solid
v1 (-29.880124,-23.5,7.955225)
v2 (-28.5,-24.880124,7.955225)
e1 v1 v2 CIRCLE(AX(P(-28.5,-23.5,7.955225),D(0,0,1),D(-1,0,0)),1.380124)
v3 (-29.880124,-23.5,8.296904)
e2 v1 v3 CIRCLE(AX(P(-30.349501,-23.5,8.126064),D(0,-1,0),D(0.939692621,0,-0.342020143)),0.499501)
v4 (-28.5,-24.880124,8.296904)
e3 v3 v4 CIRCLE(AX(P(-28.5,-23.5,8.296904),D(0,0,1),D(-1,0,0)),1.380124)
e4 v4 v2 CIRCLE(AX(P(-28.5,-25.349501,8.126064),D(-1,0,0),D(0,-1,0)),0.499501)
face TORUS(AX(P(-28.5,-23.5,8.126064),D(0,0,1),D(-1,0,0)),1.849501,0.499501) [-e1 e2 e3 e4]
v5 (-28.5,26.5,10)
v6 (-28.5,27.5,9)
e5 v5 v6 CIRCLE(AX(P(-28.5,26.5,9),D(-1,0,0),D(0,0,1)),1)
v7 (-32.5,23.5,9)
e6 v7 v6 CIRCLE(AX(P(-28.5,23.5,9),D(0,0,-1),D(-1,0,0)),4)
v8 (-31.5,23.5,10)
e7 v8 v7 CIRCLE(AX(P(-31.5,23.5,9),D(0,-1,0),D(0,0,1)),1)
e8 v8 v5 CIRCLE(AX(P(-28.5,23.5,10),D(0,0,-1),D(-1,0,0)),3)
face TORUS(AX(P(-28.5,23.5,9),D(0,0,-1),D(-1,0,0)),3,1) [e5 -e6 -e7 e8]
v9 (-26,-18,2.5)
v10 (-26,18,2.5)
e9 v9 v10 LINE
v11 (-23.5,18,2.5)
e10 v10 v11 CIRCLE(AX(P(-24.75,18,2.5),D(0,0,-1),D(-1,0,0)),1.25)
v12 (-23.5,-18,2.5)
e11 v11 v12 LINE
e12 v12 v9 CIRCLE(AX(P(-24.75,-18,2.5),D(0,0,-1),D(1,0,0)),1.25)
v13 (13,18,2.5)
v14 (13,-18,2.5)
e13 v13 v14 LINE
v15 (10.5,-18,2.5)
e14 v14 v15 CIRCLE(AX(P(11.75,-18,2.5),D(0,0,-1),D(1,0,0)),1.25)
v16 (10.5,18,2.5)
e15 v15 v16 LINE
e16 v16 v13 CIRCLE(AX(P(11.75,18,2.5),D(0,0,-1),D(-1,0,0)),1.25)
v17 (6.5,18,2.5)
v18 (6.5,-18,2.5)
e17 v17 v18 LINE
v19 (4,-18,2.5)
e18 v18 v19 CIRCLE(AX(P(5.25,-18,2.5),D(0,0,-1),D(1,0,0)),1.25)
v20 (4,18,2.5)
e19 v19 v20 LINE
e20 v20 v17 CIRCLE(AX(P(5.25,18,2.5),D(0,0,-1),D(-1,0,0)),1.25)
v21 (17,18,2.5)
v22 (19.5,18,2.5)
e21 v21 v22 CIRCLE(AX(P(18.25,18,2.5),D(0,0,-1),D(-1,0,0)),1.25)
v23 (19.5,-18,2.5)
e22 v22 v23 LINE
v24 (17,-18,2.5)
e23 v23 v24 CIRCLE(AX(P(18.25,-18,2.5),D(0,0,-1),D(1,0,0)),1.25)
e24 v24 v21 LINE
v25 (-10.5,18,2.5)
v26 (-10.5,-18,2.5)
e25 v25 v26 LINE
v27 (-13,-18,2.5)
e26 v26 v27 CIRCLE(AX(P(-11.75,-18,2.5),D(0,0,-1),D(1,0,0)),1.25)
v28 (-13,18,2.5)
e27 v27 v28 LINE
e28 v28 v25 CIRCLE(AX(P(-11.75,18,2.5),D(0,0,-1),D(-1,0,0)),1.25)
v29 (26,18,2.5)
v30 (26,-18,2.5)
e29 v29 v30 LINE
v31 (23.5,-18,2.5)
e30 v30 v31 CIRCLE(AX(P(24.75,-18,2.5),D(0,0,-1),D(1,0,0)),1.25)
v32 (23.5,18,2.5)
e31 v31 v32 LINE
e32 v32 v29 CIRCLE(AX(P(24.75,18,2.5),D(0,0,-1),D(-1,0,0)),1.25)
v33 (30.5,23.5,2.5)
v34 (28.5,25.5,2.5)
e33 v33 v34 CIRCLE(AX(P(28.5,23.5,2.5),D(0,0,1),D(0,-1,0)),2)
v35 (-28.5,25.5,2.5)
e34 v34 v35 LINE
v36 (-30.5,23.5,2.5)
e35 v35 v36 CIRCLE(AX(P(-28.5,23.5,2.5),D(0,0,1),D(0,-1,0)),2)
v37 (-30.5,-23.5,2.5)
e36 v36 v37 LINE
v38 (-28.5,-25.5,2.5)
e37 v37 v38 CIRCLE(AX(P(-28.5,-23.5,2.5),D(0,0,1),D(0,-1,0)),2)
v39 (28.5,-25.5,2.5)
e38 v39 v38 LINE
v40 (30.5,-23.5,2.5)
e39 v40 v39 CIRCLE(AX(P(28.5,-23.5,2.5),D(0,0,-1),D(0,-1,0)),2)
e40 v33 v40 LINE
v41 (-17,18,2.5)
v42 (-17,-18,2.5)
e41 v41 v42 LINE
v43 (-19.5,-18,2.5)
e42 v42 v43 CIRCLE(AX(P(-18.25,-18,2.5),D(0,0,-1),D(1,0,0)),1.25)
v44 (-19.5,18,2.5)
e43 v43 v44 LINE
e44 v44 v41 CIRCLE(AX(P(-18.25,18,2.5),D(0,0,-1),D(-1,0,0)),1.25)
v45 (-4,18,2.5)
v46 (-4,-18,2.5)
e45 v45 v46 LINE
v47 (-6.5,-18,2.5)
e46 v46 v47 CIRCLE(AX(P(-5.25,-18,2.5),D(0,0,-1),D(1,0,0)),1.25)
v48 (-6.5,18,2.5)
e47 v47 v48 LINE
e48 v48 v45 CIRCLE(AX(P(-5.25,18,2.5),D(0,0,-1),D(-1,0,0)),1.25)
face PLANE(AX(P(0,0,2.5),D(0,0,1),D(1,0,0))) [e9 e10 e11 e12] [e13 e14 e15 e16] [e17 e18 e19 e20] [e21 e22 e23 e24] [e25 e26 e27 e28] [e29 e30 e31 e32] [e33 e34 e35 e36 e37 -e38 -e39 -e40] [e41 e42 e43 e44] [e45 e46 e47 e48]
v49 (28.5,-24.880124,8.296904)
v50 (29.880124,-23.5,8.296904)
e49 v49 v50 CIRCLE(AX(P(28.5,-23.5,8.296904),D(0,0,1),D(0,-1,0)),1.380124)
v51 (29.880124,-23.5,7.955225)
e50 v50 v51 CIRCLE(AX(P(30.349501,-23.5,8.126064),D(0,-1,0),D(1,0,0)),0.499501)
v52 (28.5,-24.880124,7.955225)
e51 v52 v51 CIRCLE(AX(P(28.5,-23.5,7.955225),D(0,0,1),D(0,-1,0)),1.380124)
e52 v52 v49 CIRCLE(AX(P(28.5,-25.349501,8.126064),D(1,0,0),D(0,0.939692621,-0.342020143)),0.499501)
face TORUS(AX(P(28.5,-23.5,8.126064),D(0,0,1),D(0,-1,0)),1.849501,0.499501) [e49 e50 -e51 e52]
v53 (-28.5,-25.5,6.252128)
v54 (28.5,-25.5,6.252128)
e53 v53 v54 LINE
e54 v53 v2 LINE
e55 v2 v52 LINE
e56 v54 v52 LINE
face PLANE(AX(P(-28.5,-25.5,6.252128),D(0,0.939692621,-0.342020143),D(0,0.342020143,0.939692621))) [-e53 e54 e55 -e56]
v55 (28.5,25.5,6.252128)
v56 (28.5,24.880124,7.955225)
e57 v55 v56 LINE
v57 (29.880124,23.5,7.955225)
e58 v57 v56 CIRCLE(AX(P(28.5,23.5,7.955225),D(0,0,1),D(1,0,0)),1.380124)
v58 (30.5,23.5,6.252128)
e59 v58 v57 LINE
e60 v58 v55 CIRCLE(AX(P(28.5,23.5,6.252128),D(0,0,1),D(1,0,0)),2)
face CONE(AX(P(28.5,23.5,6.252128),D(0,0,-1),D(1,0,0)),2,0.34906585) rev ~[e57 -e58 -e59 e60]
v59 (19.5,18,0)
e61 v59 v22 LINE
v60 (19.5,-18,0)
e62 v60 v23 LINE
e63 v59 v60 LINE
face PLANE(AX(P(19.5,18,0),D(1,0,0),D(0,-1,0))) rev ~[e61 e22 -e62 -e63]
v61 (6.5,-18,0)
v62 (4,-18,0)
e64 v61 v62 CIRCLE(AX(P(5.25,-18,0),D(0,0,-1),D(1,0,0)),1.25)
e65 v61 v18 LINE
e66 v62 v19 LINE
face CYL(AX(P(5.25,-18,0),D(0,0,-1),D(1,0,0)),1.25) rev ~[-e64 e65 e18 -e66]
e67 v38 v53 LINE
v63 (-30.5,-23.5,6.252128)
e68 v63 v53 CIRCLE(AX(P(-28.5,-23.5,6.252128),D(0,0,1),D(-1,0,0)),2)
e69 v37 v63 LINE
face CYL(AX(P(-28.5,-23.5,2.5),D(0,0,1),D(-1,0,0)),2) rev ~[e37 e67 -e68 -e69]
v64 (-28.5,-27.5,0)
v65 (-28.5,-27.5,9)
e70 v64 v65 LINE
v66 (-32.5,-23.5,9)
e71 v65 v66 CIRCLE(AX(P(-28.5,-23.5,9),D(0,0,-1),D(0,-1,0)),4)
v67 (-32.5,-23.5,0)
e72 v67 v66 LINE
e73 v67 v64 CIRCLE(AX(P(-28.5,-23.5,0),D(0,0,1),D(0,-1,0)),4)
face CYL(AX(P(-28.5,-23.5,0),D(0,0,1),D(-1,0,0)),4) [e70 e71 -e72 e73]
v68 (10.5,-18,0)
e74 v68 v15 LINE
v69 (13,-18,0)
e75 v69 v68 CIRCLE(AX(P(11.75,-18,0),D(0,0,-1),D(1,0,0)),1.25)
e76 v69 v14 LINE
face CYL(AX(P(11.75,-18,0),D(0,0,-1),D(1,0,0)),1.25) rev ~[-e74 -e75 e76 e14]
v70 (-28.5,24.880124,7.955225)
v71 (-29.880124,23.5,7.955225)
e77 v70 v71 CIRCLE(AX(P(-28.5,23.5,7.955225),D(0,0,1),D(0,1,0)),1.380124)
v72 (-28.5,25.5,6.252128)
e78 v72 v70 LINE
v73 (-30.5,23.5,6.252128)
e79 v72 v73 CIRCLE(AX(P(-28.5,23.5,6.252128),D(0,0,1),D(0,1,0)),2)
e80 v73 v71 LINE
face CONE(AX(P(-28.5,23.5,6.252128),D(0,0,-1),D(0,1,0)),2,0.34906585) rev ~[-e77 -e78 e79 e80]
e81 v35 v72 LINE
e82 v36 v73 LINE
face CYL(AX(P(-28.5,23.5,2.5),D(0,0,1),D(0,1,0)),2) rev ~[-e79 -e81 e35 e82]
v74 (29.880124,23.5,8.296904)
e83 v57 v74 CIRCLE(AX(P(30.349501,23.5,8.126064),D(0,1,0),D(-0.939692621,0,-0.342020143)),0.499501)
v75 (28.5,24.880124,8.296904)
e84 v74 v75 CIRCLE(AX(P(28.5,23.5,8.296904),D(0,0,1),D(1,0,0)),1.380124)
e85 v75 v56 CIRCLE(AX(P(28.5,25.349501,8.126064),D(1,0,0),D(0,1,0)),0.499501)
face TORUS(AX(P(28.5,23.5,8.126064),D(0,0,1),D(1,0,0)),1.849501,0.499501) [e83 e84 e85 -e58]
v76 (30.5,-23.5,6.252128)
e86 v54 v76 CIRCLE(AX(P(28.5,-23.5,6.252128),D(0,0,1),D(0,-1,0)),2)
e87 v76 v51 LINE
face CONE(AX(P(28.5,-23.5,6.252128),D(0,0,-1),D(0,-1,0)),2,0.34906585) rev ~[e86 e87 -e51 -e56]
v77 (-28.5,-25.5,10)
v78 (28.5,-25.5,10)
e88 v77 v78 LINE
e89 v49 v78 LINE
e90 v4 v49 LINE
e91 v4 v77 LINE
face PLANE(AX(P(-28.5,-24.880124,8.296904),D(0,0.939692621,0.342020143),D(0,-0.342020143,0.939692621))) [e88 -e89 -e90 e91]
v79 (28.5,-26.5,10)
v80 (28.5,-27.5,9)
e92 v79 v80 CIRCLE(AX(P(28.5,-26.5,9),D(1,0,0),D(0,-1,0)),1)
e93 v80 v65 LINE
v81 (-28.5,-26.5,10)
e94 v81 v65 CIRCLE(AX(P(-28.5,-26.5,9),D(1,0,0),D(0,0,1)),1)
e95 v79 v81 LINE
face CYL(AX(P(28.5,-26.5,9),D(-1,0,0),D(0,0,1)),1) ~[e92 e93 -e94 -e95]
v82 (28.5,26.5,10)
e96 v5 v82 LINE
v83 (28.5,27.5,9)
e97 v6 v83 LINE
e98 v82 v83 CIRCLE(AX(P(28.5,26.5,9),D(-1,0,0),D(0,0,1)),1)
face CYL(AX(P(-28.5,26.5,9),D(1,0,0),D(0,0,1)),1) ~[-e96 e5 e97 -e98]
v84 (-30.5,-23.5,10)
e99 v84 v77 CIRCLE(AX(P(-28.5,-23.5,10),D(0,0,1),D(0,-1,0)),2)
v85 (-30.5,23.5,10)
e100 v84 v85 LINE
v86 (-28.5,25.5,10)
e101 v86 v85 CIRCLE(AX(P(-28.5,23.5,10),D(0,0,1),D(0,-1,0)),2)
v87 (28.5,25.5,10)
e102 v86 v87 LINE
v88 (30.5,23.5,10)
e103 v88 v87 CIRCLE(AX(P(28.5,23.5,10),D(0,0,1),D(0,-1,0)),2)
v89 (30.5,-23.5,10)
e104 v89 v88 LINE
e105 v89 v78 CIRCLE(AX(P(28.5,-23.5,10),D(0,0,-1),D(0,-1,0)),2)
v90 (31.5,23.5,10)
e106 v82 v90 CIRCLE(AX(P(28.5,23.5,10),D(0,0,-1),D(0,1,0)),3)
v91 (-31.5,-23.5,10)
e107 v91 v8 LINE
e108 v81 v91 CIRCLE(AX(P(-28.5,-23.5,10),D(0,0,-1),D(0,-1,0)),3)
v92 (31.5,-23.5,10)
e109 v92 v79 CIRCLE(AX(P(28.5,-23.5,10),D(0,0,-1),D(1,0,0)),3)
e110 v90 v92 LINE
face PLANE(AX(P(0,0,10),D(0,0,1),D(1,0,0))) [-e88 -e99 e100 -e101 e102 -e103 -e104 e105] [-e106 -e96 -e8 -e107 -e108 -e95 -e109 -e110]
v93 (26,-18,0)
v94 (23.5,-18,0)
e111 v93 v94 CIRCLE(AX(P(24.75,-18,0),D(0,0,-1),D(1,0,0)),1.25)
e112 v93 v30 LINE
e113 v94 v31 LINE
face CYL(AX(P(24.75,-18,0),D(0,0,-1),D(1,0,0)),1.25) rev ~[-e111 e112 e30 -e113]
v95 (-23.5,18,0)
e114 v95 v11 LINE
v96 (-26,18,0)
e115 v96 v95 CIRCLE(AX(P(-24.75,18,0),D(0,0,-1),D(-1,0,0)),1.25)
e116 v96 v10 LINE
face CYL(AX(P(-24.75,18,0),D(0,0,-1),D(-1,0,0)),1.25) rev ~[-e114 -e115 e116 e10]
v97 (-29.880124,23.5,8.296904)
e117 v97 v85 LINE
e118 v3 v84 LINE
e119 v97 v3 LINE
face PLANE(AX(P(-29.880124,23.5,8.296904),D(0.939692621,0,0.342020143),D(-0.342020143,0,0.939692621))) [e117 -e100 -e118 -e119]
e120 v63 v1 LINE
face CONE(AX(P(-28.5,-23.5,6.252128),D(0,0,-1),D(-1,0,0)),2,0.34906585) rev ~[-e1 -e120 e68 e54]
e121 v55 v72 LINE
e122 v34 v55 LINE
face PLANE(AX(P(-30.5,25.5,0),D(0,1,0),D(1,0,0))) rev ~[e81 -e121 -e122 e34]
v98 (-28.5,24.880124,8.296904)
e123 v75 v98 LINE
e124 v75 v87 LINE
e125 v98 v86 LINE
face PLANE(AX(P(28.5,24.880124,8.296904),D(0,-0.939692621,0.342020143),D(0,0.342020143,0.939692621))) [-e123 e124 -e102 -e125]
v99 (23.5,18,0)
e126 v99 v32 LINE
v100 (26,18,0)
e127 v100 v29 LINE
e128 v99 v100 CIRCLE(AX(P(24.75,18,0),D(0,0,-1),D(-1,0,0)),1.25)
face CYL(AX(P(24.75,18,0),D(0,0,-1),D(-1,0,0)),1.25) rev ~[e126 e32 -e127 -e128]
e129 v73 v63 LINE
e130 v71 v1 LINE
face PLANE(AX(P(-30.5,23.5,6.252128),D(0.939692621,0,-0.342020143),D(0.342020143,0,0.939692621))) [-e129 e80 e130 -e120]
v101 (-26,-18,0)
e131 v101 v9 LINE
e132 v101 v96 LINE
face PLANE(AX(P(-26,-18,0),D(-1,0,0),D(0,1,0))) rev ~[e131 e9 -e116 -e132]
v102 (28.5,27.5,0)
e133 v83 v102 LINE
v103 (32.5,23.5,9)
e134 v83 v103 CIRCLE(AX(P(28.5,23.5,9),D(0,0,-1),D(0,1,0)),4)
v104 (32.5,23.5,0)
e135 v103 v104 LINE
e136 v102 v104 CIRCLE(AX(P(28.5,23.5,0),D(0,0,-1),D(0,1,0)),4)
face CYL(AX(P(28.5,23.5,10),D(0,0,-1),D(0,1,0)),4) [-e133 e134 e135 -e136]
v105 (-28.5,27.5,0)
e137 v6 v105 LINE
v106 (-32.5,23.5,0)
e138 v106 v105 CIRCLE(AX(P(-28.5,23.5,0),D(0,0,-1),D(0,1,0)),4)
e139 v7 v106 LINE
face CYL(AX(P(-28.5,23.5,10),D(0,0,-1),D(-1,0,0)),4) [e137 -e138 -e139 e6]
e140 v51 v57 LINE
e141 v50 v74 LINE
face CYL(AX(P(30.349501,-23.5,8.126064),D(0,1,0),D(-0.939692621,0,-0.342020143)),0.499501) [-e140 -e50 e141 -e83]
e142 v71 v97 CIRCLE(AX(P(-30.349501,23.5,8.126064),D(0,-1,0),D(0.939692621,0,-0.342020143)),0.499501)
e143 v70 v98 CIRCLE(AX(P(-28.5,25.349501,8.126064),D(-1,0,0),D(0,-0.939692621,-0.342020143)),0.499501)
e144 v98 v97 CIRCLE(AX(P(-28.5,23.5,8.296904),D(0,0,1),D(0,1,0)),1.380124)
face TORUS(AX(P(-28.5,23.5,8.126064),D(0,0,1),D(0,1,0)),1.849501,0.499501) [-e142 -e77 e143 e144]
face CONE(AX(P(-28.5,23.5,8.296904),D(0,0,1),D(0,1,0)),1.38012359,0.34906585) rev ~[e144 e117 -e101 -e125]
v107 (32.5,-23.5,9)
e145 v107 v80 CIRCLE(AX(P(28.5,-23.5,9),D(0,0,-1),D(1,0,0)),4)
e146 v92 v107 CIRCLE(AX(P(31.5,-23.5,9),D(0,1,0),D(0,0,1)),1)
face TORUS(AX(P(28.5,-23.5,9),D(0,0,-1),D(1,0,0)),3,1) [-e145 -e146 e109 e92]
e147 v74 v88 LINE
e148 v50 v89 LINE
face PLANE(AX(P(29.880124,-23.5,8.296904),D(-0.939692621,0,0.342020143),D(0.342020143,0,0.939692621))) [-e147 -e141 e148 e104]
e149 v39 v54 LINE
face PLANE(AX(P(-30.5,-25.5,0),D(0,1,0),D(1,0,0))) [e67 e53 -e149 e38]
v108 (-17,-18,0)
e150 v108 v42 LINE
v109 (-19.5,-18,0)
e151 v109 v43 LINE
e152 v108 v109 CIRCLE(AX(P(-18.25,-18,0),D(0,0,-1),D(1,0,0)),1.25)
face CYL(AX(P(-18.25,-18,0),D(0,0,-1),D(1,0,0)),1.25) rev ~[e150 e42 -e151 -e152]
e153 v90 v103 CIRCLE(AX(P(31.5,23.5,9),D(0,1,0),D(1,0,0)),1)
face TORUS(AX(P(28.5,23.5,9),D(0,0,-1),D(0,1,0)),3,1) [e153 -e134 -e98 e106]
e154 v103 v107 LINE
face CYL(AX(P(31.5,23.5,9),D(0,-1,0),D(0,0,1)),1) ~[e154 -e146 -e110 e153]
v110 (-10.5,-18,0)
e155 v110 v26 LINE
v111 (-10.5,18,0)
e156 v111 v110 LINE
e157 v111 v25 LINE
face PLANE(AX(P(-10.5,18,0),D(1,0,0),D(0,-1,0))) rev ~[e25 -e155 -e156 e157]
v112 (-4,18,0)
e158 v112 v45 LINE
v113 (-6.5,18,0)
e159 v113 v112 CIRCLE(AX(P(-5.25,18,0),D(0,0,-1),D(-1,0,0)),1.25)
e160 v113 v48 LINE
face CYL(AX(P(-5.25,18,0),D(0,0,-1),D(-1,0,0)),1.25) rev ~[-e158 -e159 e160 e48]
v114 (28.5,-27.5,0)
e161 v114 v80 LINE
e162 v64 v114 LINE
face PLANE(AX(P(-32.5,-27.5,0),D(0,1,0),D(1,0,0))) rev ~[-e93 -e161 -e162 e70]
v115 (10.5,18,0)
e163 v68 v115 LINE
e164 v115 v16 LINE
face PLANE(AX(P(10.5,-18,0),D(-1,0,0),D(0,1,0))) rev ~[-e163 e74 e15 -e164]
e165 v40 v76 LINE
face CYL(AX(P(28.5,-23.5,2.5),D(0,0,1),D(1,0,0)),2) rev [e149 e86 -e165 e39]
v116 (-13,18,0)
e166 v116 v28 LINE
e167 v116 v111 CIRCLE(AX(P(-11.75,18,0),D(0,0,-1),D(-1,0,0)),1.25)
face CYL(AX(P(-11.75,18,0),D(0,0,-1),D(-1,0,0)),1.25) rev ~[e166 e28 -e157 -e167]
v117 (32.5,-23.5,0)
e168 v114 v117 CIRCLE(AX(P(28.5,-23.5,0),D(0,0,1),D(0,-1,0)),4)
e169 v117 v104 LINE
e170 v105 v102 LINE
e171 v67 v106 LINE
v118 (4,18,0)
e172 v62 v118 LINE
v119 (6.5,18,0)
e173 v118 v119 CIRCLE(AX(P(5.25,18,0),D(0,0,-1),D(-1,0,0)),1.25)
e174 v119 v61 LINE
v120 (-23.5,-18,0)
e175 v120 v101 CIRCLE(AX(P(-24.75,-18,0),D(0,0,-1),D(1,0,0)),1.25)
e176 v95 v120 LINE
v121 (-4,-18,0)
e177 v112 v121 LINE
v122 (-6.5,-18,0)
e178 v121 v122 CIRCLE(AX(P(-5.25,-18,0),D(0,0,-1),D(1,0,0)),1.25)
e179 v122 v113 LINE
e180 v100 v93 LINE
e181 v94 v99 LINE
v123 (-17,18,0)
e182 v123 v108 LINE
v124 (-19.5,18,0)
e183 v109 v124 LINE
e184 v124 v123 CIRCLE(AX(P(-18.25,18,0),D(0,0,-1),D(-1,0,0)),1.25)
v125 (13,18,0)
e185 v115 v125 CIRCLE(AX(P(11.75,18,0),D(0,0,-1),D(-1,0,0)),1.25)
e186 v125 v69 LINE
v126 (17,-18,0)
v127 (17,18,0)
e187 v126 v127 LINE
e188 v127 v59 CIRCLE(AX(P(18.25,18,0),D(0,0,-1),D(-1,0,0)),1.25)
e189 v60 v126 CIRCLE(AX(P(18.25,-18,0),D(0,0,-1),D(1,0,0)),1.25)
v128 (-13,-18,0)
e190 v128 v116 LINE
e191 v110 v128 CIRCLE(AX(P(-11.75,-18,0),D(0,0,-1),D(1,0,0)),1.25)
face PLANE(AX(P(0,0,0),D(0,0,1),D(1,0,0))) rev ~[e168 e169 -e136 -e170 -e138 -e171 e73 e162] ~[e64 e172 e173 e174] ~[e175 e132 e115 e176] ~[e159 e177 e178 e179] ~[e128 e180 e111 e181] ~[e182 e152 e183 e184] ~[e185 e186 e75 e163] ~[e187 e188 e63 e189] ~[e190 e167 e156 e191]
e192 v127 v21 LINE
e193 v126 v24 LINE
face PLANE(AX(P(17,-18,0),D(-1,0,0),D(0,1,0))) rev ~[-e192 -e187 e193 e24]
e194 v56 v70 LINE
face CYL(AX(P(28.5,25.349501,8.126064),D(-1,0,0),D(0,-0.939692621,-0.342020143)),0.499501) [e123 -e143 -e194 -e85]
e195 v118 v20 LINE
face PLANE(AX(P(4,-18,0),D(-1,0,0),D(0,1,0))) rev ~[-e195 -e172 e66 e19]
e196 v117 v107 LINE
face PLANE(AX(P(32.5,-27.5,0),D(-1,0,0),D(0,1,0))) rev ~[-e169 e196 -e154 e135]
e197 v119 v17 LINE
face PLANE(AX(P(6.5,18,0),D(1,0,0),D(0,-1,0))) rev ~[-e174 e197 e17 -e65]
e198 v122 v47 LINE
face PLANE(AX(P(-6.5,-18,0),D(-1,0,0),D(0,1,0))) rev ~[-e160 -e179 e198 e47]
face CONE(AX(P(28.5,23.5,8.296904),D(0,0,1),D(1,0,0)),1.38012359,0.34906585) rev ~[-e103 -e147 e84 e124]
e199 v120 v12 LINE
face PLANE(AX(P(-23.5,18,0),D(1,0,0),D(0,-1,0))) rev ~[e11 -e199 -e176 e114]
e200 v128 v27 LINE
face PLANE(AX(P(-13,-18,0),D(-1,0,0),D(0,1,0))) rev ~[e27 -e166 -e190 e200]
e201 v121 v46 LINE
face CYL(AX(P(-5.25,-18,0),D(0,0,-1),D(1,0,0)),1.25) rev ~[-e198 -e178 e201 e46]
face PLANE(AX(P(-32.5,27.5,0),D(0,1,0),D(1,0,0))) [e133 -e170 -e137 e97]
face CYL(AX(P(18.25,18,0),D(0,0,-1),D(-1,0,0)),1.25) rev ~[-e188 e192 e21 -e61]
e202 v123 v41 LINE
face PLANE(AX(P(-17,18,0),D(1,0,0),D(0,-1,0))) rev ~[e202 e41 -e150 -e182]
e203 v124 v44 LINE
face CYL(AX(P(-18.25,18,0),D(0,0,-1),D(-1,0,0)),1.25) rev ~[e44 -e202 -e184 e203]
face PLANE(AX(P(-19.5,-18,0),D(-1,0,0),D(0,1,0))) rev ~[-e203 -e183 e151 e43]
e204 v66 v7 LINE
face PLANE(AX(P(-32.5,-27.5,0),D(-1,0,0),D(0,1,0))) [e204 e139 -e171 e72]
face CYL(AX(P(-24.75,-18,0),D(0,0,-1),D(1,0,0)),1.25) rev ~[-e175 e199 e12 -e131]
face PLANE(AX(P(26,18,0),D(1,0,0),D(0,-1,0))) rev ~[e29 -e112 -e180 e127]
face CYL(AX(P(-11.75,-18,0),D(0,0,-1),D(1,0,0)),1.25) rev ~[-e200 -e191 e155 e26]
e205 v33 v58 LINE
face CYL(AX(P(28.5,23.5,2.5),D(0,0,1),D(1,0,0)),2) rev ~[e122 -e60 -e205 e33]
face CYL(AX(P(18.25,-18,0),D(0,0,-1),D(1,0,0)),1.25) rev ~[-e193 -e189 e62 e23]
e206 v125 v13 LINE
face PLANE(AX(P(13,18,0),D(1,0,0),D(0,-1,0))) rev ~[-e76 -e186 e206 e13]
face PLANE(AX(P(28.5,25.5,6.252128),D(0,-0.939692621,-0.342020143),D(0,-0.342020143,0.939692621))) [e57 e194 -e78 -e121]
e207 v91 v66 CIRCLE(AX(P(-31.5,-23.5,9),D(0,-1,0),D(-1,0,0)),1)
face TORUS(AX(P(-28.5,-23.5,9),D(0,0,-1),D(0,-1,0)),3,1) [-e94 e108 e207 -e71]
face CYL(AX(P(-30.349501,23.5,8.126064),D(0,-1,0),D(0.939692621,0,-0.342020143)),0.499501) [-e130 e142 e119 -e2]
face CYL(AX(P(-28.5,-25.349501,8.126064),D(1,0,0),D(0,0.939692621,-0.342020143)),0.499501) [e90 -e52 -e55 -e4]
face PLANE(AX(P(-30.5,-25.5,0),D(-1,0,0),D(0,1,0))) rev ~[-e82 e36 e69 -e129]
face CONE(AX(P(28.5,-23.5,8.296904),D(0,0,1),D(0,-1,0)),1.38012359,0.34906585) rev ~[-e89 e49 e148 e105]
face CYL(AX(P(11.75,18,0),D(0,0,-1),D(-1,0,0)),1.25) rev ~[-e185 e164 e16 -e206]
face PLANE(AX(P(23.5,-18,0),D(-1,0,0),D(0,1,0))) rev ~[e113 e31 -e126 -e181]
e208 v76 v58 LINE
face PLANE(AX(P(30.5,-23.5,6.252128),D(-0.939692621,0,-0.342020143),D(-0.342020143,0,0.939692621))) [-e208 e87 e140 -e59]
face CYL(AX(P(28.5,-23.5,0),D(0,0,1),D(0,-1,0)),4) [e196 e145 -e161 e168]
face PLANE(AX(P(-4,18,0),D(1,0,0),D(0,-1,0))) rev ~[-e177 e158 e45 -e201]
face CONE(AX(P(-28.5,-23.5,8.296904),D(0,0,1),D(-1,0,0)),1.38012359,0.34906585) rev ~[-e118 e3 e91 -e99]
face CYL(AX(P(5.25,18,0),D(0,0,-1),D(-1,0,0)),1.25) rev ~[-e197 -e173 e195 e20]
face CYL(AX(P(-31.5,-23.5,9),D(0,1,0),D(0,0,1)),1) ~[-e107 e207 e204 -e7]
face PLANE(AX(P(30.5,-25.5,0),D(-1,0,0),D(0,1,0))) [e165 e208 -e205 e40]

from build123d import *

# Parameters (mm, degrees)
F0_W     = 65
F0_H     = 55
F0_W_2   = 61
F0_H_2   = 51
F1_DEPTH = 2.5
F2_DEPTH = 10
F3_R     = 2
F4_R     = 4
F7_R     = 1


with BuildPart() as f1:
    # F0 (on Top) → F1 (new body)
    with BuildSketch(Plane.XY):
        Rectangle(F0_W, F0_H)
        Rectangle(F0_W_2, F0_H_2, mode=Mode.SUBTRACT)
        Rectangle(F0_W_2, F0_H_2)
        with BuildLine():
            ThreePointArc((-26, 18), (-24.75, 19.25), (-23.5, 18))
            Line((-23.5, 18), (-23.5, -18))
            ThreePointArc((-23.5, -18), (-24.75, -19.25), (-26, -18))
            Line((-26, -18), (-26, 18))
        make_face(mode=Mode.SUBTRACT)
        with BuildLine():
            Line((-19.5, -18), (-19.5, 18))
            ThreePointArc((-19.5, 18), (-18.25, 19.25), (-17, 18))
            Line((-17, 18), (-17, -18))
            ThreePointArc((-17, -18), (-18.25, -19.25), (-19.5, -18))
        make_face(mode=Mode.SUBTRACT)
        with BuildLine():
            Line((-13, -18), (-13, 18))
            ThreePointArc((-13, 18), (-11.75, 19.25), (-10.5, 18))
            Line((-10.5, 18), (-10.5, -18))
            ThreePointArc((-10.5, -18), (-11.75, -19.25), (-13, -18))
        make_face(mode=Mode.SUBTRACT)
        with BuildLine():
            Line((-6.5, -18), (-6.5, 18))
            ThreePointArc((-6.5, 18), (-5.25, 19.25), (-4, 18))
            Line((-4, 18), (-4, -18))
            ThreePointArc((-4, -18), (-5.25, -19.25), (-6.5, -18))
        make_face(mode=Mode.SUBTRACT)
        with BuildLine():
            Line((4, -18), (4, 18))
            ThreePointArc((4, 18), (5.25, 19.25), (6.5, 18))
            Line((6.5, 18), (6.5, -18))
            ThreePointArc((6.5, -18), (5.25, -19.25), (4, -18))
        make_face(mode=Mode.SUBTRACT)
        with BuildLine():
            Line((10.5, -18), (10.5, 18))
            ThreePointArc((10.5, 18), (11.75, 19.25), (13, 18))
            Line((13, 18), (13, -18))
            ThreePointArc((13, -18), (11.75, -19.25), (10.5, -18))
        make_face(mode=Mode.SUBTRACT)
        with BuildLine():
            ThreePointArc((17, 18), (18.25, 19.25), (19.5, 18))
            Line((19.5, 18), (19.5, -18))
            ThreePointArc((19.5, -18), (18.25, -19.25), (17, -18))
            Line((17, -18), (17, 18))
        make_face(mode=Mode.SUBTRACT)
        with BuildLine():
            Line((23.5, -18), (23.5, 18))
            ThreePointArc((23.5, 18), (24.75, 19.25), (26, 18))
            Line((26, 18), (26, -18))
            ThreePointArc((26, -18), (24.75, -19.25), (23.5, -18))
        make_face(mode=Mode.SUBTRACT)
    extrude(amount=F1_DEPTH)

    # F0 (on Top) → F2 (join)
    with BuildSketch(Plane.XY):
        Rectangle(F0_W, F0_H)
        Rectangle(F0_W_2, F0_H_2, mode=Mode.SUBTRACT)
    extrude(amount=F2_DEPTH)

    # F3
    f3_edges = [f1.edges().sort_by_distance(p)[0] for p in [
        (-30.5, 25.5, 6.25),
        (30.5, 25.5, 6.25),
        (-30.5, -25.5, 6.25),
        (30.5, -25.5, 6.25),
    ]]
    fillet(f3_edges, radius=F3_R)

    # F4
    f4_edges = [f1.edges().sort_by_distance(p)[0] for p in [
        (-32.5, 27.5, 5),
        (32.5, 27.5, 5),
        (-32.5, -27.5, 5),
        (32.5, -27.5, 5),
    ]]
    fillet(f4_edges, radius=F4_R)

    # F6: sweep along a path in F6_path
    with BuildLine(Plane(origin=(-30.5, 23.5, 10), x_dir=(0, 1, 0), z_dir=(0, 0, 1))) as f6_path:
        Line((0, 0), (-47, 0))
        ThreePointArc((-47, 0), (-48.4142135624, -0.5857864376), (-49, -2))
        Line((-49, -2), (-49, -59))
        ThreePointArc((-49, -59), (-48.4142135624, -60.4142135624), (-47, -61))
        Line((-47, -61), (0, -61))
        ThreePointArc((0, -61), (1.4142135624, -60.4142135624), (2, -59))
        Line((2, -59), (2, -2))
        ThreePointArc((2, -2), (1.4142135624, -0.5857864376), (0, 0))
    # F5 (on Front) → F6 (sweep)
    with BuildSketch(Plane.XZ):
        with BuildLine():
            Line((-30.5, 10), (-30.5, 6.2521283853))
            Line((-30.5, 6.2521283853), (-29.8801235899, 7.9552248249))
            ThreePointArc((-29.8801235899, 7.9552248249), (-29.85, 8.1260641927), (-29.8801235899, 8.2969035604))
            Line((-29.8801235899, 8.2969035604), (-30.5, 10))
        make_face()
    sweep(path=f6_path.line)

    # F7
    f7_edges = [f1.edges().sort_by_distance(p)[0] for p in [
        (0, 27.5, 10),
    ]]
    fillet(f7_edges, radius=F7_R)


solid = f1.part
